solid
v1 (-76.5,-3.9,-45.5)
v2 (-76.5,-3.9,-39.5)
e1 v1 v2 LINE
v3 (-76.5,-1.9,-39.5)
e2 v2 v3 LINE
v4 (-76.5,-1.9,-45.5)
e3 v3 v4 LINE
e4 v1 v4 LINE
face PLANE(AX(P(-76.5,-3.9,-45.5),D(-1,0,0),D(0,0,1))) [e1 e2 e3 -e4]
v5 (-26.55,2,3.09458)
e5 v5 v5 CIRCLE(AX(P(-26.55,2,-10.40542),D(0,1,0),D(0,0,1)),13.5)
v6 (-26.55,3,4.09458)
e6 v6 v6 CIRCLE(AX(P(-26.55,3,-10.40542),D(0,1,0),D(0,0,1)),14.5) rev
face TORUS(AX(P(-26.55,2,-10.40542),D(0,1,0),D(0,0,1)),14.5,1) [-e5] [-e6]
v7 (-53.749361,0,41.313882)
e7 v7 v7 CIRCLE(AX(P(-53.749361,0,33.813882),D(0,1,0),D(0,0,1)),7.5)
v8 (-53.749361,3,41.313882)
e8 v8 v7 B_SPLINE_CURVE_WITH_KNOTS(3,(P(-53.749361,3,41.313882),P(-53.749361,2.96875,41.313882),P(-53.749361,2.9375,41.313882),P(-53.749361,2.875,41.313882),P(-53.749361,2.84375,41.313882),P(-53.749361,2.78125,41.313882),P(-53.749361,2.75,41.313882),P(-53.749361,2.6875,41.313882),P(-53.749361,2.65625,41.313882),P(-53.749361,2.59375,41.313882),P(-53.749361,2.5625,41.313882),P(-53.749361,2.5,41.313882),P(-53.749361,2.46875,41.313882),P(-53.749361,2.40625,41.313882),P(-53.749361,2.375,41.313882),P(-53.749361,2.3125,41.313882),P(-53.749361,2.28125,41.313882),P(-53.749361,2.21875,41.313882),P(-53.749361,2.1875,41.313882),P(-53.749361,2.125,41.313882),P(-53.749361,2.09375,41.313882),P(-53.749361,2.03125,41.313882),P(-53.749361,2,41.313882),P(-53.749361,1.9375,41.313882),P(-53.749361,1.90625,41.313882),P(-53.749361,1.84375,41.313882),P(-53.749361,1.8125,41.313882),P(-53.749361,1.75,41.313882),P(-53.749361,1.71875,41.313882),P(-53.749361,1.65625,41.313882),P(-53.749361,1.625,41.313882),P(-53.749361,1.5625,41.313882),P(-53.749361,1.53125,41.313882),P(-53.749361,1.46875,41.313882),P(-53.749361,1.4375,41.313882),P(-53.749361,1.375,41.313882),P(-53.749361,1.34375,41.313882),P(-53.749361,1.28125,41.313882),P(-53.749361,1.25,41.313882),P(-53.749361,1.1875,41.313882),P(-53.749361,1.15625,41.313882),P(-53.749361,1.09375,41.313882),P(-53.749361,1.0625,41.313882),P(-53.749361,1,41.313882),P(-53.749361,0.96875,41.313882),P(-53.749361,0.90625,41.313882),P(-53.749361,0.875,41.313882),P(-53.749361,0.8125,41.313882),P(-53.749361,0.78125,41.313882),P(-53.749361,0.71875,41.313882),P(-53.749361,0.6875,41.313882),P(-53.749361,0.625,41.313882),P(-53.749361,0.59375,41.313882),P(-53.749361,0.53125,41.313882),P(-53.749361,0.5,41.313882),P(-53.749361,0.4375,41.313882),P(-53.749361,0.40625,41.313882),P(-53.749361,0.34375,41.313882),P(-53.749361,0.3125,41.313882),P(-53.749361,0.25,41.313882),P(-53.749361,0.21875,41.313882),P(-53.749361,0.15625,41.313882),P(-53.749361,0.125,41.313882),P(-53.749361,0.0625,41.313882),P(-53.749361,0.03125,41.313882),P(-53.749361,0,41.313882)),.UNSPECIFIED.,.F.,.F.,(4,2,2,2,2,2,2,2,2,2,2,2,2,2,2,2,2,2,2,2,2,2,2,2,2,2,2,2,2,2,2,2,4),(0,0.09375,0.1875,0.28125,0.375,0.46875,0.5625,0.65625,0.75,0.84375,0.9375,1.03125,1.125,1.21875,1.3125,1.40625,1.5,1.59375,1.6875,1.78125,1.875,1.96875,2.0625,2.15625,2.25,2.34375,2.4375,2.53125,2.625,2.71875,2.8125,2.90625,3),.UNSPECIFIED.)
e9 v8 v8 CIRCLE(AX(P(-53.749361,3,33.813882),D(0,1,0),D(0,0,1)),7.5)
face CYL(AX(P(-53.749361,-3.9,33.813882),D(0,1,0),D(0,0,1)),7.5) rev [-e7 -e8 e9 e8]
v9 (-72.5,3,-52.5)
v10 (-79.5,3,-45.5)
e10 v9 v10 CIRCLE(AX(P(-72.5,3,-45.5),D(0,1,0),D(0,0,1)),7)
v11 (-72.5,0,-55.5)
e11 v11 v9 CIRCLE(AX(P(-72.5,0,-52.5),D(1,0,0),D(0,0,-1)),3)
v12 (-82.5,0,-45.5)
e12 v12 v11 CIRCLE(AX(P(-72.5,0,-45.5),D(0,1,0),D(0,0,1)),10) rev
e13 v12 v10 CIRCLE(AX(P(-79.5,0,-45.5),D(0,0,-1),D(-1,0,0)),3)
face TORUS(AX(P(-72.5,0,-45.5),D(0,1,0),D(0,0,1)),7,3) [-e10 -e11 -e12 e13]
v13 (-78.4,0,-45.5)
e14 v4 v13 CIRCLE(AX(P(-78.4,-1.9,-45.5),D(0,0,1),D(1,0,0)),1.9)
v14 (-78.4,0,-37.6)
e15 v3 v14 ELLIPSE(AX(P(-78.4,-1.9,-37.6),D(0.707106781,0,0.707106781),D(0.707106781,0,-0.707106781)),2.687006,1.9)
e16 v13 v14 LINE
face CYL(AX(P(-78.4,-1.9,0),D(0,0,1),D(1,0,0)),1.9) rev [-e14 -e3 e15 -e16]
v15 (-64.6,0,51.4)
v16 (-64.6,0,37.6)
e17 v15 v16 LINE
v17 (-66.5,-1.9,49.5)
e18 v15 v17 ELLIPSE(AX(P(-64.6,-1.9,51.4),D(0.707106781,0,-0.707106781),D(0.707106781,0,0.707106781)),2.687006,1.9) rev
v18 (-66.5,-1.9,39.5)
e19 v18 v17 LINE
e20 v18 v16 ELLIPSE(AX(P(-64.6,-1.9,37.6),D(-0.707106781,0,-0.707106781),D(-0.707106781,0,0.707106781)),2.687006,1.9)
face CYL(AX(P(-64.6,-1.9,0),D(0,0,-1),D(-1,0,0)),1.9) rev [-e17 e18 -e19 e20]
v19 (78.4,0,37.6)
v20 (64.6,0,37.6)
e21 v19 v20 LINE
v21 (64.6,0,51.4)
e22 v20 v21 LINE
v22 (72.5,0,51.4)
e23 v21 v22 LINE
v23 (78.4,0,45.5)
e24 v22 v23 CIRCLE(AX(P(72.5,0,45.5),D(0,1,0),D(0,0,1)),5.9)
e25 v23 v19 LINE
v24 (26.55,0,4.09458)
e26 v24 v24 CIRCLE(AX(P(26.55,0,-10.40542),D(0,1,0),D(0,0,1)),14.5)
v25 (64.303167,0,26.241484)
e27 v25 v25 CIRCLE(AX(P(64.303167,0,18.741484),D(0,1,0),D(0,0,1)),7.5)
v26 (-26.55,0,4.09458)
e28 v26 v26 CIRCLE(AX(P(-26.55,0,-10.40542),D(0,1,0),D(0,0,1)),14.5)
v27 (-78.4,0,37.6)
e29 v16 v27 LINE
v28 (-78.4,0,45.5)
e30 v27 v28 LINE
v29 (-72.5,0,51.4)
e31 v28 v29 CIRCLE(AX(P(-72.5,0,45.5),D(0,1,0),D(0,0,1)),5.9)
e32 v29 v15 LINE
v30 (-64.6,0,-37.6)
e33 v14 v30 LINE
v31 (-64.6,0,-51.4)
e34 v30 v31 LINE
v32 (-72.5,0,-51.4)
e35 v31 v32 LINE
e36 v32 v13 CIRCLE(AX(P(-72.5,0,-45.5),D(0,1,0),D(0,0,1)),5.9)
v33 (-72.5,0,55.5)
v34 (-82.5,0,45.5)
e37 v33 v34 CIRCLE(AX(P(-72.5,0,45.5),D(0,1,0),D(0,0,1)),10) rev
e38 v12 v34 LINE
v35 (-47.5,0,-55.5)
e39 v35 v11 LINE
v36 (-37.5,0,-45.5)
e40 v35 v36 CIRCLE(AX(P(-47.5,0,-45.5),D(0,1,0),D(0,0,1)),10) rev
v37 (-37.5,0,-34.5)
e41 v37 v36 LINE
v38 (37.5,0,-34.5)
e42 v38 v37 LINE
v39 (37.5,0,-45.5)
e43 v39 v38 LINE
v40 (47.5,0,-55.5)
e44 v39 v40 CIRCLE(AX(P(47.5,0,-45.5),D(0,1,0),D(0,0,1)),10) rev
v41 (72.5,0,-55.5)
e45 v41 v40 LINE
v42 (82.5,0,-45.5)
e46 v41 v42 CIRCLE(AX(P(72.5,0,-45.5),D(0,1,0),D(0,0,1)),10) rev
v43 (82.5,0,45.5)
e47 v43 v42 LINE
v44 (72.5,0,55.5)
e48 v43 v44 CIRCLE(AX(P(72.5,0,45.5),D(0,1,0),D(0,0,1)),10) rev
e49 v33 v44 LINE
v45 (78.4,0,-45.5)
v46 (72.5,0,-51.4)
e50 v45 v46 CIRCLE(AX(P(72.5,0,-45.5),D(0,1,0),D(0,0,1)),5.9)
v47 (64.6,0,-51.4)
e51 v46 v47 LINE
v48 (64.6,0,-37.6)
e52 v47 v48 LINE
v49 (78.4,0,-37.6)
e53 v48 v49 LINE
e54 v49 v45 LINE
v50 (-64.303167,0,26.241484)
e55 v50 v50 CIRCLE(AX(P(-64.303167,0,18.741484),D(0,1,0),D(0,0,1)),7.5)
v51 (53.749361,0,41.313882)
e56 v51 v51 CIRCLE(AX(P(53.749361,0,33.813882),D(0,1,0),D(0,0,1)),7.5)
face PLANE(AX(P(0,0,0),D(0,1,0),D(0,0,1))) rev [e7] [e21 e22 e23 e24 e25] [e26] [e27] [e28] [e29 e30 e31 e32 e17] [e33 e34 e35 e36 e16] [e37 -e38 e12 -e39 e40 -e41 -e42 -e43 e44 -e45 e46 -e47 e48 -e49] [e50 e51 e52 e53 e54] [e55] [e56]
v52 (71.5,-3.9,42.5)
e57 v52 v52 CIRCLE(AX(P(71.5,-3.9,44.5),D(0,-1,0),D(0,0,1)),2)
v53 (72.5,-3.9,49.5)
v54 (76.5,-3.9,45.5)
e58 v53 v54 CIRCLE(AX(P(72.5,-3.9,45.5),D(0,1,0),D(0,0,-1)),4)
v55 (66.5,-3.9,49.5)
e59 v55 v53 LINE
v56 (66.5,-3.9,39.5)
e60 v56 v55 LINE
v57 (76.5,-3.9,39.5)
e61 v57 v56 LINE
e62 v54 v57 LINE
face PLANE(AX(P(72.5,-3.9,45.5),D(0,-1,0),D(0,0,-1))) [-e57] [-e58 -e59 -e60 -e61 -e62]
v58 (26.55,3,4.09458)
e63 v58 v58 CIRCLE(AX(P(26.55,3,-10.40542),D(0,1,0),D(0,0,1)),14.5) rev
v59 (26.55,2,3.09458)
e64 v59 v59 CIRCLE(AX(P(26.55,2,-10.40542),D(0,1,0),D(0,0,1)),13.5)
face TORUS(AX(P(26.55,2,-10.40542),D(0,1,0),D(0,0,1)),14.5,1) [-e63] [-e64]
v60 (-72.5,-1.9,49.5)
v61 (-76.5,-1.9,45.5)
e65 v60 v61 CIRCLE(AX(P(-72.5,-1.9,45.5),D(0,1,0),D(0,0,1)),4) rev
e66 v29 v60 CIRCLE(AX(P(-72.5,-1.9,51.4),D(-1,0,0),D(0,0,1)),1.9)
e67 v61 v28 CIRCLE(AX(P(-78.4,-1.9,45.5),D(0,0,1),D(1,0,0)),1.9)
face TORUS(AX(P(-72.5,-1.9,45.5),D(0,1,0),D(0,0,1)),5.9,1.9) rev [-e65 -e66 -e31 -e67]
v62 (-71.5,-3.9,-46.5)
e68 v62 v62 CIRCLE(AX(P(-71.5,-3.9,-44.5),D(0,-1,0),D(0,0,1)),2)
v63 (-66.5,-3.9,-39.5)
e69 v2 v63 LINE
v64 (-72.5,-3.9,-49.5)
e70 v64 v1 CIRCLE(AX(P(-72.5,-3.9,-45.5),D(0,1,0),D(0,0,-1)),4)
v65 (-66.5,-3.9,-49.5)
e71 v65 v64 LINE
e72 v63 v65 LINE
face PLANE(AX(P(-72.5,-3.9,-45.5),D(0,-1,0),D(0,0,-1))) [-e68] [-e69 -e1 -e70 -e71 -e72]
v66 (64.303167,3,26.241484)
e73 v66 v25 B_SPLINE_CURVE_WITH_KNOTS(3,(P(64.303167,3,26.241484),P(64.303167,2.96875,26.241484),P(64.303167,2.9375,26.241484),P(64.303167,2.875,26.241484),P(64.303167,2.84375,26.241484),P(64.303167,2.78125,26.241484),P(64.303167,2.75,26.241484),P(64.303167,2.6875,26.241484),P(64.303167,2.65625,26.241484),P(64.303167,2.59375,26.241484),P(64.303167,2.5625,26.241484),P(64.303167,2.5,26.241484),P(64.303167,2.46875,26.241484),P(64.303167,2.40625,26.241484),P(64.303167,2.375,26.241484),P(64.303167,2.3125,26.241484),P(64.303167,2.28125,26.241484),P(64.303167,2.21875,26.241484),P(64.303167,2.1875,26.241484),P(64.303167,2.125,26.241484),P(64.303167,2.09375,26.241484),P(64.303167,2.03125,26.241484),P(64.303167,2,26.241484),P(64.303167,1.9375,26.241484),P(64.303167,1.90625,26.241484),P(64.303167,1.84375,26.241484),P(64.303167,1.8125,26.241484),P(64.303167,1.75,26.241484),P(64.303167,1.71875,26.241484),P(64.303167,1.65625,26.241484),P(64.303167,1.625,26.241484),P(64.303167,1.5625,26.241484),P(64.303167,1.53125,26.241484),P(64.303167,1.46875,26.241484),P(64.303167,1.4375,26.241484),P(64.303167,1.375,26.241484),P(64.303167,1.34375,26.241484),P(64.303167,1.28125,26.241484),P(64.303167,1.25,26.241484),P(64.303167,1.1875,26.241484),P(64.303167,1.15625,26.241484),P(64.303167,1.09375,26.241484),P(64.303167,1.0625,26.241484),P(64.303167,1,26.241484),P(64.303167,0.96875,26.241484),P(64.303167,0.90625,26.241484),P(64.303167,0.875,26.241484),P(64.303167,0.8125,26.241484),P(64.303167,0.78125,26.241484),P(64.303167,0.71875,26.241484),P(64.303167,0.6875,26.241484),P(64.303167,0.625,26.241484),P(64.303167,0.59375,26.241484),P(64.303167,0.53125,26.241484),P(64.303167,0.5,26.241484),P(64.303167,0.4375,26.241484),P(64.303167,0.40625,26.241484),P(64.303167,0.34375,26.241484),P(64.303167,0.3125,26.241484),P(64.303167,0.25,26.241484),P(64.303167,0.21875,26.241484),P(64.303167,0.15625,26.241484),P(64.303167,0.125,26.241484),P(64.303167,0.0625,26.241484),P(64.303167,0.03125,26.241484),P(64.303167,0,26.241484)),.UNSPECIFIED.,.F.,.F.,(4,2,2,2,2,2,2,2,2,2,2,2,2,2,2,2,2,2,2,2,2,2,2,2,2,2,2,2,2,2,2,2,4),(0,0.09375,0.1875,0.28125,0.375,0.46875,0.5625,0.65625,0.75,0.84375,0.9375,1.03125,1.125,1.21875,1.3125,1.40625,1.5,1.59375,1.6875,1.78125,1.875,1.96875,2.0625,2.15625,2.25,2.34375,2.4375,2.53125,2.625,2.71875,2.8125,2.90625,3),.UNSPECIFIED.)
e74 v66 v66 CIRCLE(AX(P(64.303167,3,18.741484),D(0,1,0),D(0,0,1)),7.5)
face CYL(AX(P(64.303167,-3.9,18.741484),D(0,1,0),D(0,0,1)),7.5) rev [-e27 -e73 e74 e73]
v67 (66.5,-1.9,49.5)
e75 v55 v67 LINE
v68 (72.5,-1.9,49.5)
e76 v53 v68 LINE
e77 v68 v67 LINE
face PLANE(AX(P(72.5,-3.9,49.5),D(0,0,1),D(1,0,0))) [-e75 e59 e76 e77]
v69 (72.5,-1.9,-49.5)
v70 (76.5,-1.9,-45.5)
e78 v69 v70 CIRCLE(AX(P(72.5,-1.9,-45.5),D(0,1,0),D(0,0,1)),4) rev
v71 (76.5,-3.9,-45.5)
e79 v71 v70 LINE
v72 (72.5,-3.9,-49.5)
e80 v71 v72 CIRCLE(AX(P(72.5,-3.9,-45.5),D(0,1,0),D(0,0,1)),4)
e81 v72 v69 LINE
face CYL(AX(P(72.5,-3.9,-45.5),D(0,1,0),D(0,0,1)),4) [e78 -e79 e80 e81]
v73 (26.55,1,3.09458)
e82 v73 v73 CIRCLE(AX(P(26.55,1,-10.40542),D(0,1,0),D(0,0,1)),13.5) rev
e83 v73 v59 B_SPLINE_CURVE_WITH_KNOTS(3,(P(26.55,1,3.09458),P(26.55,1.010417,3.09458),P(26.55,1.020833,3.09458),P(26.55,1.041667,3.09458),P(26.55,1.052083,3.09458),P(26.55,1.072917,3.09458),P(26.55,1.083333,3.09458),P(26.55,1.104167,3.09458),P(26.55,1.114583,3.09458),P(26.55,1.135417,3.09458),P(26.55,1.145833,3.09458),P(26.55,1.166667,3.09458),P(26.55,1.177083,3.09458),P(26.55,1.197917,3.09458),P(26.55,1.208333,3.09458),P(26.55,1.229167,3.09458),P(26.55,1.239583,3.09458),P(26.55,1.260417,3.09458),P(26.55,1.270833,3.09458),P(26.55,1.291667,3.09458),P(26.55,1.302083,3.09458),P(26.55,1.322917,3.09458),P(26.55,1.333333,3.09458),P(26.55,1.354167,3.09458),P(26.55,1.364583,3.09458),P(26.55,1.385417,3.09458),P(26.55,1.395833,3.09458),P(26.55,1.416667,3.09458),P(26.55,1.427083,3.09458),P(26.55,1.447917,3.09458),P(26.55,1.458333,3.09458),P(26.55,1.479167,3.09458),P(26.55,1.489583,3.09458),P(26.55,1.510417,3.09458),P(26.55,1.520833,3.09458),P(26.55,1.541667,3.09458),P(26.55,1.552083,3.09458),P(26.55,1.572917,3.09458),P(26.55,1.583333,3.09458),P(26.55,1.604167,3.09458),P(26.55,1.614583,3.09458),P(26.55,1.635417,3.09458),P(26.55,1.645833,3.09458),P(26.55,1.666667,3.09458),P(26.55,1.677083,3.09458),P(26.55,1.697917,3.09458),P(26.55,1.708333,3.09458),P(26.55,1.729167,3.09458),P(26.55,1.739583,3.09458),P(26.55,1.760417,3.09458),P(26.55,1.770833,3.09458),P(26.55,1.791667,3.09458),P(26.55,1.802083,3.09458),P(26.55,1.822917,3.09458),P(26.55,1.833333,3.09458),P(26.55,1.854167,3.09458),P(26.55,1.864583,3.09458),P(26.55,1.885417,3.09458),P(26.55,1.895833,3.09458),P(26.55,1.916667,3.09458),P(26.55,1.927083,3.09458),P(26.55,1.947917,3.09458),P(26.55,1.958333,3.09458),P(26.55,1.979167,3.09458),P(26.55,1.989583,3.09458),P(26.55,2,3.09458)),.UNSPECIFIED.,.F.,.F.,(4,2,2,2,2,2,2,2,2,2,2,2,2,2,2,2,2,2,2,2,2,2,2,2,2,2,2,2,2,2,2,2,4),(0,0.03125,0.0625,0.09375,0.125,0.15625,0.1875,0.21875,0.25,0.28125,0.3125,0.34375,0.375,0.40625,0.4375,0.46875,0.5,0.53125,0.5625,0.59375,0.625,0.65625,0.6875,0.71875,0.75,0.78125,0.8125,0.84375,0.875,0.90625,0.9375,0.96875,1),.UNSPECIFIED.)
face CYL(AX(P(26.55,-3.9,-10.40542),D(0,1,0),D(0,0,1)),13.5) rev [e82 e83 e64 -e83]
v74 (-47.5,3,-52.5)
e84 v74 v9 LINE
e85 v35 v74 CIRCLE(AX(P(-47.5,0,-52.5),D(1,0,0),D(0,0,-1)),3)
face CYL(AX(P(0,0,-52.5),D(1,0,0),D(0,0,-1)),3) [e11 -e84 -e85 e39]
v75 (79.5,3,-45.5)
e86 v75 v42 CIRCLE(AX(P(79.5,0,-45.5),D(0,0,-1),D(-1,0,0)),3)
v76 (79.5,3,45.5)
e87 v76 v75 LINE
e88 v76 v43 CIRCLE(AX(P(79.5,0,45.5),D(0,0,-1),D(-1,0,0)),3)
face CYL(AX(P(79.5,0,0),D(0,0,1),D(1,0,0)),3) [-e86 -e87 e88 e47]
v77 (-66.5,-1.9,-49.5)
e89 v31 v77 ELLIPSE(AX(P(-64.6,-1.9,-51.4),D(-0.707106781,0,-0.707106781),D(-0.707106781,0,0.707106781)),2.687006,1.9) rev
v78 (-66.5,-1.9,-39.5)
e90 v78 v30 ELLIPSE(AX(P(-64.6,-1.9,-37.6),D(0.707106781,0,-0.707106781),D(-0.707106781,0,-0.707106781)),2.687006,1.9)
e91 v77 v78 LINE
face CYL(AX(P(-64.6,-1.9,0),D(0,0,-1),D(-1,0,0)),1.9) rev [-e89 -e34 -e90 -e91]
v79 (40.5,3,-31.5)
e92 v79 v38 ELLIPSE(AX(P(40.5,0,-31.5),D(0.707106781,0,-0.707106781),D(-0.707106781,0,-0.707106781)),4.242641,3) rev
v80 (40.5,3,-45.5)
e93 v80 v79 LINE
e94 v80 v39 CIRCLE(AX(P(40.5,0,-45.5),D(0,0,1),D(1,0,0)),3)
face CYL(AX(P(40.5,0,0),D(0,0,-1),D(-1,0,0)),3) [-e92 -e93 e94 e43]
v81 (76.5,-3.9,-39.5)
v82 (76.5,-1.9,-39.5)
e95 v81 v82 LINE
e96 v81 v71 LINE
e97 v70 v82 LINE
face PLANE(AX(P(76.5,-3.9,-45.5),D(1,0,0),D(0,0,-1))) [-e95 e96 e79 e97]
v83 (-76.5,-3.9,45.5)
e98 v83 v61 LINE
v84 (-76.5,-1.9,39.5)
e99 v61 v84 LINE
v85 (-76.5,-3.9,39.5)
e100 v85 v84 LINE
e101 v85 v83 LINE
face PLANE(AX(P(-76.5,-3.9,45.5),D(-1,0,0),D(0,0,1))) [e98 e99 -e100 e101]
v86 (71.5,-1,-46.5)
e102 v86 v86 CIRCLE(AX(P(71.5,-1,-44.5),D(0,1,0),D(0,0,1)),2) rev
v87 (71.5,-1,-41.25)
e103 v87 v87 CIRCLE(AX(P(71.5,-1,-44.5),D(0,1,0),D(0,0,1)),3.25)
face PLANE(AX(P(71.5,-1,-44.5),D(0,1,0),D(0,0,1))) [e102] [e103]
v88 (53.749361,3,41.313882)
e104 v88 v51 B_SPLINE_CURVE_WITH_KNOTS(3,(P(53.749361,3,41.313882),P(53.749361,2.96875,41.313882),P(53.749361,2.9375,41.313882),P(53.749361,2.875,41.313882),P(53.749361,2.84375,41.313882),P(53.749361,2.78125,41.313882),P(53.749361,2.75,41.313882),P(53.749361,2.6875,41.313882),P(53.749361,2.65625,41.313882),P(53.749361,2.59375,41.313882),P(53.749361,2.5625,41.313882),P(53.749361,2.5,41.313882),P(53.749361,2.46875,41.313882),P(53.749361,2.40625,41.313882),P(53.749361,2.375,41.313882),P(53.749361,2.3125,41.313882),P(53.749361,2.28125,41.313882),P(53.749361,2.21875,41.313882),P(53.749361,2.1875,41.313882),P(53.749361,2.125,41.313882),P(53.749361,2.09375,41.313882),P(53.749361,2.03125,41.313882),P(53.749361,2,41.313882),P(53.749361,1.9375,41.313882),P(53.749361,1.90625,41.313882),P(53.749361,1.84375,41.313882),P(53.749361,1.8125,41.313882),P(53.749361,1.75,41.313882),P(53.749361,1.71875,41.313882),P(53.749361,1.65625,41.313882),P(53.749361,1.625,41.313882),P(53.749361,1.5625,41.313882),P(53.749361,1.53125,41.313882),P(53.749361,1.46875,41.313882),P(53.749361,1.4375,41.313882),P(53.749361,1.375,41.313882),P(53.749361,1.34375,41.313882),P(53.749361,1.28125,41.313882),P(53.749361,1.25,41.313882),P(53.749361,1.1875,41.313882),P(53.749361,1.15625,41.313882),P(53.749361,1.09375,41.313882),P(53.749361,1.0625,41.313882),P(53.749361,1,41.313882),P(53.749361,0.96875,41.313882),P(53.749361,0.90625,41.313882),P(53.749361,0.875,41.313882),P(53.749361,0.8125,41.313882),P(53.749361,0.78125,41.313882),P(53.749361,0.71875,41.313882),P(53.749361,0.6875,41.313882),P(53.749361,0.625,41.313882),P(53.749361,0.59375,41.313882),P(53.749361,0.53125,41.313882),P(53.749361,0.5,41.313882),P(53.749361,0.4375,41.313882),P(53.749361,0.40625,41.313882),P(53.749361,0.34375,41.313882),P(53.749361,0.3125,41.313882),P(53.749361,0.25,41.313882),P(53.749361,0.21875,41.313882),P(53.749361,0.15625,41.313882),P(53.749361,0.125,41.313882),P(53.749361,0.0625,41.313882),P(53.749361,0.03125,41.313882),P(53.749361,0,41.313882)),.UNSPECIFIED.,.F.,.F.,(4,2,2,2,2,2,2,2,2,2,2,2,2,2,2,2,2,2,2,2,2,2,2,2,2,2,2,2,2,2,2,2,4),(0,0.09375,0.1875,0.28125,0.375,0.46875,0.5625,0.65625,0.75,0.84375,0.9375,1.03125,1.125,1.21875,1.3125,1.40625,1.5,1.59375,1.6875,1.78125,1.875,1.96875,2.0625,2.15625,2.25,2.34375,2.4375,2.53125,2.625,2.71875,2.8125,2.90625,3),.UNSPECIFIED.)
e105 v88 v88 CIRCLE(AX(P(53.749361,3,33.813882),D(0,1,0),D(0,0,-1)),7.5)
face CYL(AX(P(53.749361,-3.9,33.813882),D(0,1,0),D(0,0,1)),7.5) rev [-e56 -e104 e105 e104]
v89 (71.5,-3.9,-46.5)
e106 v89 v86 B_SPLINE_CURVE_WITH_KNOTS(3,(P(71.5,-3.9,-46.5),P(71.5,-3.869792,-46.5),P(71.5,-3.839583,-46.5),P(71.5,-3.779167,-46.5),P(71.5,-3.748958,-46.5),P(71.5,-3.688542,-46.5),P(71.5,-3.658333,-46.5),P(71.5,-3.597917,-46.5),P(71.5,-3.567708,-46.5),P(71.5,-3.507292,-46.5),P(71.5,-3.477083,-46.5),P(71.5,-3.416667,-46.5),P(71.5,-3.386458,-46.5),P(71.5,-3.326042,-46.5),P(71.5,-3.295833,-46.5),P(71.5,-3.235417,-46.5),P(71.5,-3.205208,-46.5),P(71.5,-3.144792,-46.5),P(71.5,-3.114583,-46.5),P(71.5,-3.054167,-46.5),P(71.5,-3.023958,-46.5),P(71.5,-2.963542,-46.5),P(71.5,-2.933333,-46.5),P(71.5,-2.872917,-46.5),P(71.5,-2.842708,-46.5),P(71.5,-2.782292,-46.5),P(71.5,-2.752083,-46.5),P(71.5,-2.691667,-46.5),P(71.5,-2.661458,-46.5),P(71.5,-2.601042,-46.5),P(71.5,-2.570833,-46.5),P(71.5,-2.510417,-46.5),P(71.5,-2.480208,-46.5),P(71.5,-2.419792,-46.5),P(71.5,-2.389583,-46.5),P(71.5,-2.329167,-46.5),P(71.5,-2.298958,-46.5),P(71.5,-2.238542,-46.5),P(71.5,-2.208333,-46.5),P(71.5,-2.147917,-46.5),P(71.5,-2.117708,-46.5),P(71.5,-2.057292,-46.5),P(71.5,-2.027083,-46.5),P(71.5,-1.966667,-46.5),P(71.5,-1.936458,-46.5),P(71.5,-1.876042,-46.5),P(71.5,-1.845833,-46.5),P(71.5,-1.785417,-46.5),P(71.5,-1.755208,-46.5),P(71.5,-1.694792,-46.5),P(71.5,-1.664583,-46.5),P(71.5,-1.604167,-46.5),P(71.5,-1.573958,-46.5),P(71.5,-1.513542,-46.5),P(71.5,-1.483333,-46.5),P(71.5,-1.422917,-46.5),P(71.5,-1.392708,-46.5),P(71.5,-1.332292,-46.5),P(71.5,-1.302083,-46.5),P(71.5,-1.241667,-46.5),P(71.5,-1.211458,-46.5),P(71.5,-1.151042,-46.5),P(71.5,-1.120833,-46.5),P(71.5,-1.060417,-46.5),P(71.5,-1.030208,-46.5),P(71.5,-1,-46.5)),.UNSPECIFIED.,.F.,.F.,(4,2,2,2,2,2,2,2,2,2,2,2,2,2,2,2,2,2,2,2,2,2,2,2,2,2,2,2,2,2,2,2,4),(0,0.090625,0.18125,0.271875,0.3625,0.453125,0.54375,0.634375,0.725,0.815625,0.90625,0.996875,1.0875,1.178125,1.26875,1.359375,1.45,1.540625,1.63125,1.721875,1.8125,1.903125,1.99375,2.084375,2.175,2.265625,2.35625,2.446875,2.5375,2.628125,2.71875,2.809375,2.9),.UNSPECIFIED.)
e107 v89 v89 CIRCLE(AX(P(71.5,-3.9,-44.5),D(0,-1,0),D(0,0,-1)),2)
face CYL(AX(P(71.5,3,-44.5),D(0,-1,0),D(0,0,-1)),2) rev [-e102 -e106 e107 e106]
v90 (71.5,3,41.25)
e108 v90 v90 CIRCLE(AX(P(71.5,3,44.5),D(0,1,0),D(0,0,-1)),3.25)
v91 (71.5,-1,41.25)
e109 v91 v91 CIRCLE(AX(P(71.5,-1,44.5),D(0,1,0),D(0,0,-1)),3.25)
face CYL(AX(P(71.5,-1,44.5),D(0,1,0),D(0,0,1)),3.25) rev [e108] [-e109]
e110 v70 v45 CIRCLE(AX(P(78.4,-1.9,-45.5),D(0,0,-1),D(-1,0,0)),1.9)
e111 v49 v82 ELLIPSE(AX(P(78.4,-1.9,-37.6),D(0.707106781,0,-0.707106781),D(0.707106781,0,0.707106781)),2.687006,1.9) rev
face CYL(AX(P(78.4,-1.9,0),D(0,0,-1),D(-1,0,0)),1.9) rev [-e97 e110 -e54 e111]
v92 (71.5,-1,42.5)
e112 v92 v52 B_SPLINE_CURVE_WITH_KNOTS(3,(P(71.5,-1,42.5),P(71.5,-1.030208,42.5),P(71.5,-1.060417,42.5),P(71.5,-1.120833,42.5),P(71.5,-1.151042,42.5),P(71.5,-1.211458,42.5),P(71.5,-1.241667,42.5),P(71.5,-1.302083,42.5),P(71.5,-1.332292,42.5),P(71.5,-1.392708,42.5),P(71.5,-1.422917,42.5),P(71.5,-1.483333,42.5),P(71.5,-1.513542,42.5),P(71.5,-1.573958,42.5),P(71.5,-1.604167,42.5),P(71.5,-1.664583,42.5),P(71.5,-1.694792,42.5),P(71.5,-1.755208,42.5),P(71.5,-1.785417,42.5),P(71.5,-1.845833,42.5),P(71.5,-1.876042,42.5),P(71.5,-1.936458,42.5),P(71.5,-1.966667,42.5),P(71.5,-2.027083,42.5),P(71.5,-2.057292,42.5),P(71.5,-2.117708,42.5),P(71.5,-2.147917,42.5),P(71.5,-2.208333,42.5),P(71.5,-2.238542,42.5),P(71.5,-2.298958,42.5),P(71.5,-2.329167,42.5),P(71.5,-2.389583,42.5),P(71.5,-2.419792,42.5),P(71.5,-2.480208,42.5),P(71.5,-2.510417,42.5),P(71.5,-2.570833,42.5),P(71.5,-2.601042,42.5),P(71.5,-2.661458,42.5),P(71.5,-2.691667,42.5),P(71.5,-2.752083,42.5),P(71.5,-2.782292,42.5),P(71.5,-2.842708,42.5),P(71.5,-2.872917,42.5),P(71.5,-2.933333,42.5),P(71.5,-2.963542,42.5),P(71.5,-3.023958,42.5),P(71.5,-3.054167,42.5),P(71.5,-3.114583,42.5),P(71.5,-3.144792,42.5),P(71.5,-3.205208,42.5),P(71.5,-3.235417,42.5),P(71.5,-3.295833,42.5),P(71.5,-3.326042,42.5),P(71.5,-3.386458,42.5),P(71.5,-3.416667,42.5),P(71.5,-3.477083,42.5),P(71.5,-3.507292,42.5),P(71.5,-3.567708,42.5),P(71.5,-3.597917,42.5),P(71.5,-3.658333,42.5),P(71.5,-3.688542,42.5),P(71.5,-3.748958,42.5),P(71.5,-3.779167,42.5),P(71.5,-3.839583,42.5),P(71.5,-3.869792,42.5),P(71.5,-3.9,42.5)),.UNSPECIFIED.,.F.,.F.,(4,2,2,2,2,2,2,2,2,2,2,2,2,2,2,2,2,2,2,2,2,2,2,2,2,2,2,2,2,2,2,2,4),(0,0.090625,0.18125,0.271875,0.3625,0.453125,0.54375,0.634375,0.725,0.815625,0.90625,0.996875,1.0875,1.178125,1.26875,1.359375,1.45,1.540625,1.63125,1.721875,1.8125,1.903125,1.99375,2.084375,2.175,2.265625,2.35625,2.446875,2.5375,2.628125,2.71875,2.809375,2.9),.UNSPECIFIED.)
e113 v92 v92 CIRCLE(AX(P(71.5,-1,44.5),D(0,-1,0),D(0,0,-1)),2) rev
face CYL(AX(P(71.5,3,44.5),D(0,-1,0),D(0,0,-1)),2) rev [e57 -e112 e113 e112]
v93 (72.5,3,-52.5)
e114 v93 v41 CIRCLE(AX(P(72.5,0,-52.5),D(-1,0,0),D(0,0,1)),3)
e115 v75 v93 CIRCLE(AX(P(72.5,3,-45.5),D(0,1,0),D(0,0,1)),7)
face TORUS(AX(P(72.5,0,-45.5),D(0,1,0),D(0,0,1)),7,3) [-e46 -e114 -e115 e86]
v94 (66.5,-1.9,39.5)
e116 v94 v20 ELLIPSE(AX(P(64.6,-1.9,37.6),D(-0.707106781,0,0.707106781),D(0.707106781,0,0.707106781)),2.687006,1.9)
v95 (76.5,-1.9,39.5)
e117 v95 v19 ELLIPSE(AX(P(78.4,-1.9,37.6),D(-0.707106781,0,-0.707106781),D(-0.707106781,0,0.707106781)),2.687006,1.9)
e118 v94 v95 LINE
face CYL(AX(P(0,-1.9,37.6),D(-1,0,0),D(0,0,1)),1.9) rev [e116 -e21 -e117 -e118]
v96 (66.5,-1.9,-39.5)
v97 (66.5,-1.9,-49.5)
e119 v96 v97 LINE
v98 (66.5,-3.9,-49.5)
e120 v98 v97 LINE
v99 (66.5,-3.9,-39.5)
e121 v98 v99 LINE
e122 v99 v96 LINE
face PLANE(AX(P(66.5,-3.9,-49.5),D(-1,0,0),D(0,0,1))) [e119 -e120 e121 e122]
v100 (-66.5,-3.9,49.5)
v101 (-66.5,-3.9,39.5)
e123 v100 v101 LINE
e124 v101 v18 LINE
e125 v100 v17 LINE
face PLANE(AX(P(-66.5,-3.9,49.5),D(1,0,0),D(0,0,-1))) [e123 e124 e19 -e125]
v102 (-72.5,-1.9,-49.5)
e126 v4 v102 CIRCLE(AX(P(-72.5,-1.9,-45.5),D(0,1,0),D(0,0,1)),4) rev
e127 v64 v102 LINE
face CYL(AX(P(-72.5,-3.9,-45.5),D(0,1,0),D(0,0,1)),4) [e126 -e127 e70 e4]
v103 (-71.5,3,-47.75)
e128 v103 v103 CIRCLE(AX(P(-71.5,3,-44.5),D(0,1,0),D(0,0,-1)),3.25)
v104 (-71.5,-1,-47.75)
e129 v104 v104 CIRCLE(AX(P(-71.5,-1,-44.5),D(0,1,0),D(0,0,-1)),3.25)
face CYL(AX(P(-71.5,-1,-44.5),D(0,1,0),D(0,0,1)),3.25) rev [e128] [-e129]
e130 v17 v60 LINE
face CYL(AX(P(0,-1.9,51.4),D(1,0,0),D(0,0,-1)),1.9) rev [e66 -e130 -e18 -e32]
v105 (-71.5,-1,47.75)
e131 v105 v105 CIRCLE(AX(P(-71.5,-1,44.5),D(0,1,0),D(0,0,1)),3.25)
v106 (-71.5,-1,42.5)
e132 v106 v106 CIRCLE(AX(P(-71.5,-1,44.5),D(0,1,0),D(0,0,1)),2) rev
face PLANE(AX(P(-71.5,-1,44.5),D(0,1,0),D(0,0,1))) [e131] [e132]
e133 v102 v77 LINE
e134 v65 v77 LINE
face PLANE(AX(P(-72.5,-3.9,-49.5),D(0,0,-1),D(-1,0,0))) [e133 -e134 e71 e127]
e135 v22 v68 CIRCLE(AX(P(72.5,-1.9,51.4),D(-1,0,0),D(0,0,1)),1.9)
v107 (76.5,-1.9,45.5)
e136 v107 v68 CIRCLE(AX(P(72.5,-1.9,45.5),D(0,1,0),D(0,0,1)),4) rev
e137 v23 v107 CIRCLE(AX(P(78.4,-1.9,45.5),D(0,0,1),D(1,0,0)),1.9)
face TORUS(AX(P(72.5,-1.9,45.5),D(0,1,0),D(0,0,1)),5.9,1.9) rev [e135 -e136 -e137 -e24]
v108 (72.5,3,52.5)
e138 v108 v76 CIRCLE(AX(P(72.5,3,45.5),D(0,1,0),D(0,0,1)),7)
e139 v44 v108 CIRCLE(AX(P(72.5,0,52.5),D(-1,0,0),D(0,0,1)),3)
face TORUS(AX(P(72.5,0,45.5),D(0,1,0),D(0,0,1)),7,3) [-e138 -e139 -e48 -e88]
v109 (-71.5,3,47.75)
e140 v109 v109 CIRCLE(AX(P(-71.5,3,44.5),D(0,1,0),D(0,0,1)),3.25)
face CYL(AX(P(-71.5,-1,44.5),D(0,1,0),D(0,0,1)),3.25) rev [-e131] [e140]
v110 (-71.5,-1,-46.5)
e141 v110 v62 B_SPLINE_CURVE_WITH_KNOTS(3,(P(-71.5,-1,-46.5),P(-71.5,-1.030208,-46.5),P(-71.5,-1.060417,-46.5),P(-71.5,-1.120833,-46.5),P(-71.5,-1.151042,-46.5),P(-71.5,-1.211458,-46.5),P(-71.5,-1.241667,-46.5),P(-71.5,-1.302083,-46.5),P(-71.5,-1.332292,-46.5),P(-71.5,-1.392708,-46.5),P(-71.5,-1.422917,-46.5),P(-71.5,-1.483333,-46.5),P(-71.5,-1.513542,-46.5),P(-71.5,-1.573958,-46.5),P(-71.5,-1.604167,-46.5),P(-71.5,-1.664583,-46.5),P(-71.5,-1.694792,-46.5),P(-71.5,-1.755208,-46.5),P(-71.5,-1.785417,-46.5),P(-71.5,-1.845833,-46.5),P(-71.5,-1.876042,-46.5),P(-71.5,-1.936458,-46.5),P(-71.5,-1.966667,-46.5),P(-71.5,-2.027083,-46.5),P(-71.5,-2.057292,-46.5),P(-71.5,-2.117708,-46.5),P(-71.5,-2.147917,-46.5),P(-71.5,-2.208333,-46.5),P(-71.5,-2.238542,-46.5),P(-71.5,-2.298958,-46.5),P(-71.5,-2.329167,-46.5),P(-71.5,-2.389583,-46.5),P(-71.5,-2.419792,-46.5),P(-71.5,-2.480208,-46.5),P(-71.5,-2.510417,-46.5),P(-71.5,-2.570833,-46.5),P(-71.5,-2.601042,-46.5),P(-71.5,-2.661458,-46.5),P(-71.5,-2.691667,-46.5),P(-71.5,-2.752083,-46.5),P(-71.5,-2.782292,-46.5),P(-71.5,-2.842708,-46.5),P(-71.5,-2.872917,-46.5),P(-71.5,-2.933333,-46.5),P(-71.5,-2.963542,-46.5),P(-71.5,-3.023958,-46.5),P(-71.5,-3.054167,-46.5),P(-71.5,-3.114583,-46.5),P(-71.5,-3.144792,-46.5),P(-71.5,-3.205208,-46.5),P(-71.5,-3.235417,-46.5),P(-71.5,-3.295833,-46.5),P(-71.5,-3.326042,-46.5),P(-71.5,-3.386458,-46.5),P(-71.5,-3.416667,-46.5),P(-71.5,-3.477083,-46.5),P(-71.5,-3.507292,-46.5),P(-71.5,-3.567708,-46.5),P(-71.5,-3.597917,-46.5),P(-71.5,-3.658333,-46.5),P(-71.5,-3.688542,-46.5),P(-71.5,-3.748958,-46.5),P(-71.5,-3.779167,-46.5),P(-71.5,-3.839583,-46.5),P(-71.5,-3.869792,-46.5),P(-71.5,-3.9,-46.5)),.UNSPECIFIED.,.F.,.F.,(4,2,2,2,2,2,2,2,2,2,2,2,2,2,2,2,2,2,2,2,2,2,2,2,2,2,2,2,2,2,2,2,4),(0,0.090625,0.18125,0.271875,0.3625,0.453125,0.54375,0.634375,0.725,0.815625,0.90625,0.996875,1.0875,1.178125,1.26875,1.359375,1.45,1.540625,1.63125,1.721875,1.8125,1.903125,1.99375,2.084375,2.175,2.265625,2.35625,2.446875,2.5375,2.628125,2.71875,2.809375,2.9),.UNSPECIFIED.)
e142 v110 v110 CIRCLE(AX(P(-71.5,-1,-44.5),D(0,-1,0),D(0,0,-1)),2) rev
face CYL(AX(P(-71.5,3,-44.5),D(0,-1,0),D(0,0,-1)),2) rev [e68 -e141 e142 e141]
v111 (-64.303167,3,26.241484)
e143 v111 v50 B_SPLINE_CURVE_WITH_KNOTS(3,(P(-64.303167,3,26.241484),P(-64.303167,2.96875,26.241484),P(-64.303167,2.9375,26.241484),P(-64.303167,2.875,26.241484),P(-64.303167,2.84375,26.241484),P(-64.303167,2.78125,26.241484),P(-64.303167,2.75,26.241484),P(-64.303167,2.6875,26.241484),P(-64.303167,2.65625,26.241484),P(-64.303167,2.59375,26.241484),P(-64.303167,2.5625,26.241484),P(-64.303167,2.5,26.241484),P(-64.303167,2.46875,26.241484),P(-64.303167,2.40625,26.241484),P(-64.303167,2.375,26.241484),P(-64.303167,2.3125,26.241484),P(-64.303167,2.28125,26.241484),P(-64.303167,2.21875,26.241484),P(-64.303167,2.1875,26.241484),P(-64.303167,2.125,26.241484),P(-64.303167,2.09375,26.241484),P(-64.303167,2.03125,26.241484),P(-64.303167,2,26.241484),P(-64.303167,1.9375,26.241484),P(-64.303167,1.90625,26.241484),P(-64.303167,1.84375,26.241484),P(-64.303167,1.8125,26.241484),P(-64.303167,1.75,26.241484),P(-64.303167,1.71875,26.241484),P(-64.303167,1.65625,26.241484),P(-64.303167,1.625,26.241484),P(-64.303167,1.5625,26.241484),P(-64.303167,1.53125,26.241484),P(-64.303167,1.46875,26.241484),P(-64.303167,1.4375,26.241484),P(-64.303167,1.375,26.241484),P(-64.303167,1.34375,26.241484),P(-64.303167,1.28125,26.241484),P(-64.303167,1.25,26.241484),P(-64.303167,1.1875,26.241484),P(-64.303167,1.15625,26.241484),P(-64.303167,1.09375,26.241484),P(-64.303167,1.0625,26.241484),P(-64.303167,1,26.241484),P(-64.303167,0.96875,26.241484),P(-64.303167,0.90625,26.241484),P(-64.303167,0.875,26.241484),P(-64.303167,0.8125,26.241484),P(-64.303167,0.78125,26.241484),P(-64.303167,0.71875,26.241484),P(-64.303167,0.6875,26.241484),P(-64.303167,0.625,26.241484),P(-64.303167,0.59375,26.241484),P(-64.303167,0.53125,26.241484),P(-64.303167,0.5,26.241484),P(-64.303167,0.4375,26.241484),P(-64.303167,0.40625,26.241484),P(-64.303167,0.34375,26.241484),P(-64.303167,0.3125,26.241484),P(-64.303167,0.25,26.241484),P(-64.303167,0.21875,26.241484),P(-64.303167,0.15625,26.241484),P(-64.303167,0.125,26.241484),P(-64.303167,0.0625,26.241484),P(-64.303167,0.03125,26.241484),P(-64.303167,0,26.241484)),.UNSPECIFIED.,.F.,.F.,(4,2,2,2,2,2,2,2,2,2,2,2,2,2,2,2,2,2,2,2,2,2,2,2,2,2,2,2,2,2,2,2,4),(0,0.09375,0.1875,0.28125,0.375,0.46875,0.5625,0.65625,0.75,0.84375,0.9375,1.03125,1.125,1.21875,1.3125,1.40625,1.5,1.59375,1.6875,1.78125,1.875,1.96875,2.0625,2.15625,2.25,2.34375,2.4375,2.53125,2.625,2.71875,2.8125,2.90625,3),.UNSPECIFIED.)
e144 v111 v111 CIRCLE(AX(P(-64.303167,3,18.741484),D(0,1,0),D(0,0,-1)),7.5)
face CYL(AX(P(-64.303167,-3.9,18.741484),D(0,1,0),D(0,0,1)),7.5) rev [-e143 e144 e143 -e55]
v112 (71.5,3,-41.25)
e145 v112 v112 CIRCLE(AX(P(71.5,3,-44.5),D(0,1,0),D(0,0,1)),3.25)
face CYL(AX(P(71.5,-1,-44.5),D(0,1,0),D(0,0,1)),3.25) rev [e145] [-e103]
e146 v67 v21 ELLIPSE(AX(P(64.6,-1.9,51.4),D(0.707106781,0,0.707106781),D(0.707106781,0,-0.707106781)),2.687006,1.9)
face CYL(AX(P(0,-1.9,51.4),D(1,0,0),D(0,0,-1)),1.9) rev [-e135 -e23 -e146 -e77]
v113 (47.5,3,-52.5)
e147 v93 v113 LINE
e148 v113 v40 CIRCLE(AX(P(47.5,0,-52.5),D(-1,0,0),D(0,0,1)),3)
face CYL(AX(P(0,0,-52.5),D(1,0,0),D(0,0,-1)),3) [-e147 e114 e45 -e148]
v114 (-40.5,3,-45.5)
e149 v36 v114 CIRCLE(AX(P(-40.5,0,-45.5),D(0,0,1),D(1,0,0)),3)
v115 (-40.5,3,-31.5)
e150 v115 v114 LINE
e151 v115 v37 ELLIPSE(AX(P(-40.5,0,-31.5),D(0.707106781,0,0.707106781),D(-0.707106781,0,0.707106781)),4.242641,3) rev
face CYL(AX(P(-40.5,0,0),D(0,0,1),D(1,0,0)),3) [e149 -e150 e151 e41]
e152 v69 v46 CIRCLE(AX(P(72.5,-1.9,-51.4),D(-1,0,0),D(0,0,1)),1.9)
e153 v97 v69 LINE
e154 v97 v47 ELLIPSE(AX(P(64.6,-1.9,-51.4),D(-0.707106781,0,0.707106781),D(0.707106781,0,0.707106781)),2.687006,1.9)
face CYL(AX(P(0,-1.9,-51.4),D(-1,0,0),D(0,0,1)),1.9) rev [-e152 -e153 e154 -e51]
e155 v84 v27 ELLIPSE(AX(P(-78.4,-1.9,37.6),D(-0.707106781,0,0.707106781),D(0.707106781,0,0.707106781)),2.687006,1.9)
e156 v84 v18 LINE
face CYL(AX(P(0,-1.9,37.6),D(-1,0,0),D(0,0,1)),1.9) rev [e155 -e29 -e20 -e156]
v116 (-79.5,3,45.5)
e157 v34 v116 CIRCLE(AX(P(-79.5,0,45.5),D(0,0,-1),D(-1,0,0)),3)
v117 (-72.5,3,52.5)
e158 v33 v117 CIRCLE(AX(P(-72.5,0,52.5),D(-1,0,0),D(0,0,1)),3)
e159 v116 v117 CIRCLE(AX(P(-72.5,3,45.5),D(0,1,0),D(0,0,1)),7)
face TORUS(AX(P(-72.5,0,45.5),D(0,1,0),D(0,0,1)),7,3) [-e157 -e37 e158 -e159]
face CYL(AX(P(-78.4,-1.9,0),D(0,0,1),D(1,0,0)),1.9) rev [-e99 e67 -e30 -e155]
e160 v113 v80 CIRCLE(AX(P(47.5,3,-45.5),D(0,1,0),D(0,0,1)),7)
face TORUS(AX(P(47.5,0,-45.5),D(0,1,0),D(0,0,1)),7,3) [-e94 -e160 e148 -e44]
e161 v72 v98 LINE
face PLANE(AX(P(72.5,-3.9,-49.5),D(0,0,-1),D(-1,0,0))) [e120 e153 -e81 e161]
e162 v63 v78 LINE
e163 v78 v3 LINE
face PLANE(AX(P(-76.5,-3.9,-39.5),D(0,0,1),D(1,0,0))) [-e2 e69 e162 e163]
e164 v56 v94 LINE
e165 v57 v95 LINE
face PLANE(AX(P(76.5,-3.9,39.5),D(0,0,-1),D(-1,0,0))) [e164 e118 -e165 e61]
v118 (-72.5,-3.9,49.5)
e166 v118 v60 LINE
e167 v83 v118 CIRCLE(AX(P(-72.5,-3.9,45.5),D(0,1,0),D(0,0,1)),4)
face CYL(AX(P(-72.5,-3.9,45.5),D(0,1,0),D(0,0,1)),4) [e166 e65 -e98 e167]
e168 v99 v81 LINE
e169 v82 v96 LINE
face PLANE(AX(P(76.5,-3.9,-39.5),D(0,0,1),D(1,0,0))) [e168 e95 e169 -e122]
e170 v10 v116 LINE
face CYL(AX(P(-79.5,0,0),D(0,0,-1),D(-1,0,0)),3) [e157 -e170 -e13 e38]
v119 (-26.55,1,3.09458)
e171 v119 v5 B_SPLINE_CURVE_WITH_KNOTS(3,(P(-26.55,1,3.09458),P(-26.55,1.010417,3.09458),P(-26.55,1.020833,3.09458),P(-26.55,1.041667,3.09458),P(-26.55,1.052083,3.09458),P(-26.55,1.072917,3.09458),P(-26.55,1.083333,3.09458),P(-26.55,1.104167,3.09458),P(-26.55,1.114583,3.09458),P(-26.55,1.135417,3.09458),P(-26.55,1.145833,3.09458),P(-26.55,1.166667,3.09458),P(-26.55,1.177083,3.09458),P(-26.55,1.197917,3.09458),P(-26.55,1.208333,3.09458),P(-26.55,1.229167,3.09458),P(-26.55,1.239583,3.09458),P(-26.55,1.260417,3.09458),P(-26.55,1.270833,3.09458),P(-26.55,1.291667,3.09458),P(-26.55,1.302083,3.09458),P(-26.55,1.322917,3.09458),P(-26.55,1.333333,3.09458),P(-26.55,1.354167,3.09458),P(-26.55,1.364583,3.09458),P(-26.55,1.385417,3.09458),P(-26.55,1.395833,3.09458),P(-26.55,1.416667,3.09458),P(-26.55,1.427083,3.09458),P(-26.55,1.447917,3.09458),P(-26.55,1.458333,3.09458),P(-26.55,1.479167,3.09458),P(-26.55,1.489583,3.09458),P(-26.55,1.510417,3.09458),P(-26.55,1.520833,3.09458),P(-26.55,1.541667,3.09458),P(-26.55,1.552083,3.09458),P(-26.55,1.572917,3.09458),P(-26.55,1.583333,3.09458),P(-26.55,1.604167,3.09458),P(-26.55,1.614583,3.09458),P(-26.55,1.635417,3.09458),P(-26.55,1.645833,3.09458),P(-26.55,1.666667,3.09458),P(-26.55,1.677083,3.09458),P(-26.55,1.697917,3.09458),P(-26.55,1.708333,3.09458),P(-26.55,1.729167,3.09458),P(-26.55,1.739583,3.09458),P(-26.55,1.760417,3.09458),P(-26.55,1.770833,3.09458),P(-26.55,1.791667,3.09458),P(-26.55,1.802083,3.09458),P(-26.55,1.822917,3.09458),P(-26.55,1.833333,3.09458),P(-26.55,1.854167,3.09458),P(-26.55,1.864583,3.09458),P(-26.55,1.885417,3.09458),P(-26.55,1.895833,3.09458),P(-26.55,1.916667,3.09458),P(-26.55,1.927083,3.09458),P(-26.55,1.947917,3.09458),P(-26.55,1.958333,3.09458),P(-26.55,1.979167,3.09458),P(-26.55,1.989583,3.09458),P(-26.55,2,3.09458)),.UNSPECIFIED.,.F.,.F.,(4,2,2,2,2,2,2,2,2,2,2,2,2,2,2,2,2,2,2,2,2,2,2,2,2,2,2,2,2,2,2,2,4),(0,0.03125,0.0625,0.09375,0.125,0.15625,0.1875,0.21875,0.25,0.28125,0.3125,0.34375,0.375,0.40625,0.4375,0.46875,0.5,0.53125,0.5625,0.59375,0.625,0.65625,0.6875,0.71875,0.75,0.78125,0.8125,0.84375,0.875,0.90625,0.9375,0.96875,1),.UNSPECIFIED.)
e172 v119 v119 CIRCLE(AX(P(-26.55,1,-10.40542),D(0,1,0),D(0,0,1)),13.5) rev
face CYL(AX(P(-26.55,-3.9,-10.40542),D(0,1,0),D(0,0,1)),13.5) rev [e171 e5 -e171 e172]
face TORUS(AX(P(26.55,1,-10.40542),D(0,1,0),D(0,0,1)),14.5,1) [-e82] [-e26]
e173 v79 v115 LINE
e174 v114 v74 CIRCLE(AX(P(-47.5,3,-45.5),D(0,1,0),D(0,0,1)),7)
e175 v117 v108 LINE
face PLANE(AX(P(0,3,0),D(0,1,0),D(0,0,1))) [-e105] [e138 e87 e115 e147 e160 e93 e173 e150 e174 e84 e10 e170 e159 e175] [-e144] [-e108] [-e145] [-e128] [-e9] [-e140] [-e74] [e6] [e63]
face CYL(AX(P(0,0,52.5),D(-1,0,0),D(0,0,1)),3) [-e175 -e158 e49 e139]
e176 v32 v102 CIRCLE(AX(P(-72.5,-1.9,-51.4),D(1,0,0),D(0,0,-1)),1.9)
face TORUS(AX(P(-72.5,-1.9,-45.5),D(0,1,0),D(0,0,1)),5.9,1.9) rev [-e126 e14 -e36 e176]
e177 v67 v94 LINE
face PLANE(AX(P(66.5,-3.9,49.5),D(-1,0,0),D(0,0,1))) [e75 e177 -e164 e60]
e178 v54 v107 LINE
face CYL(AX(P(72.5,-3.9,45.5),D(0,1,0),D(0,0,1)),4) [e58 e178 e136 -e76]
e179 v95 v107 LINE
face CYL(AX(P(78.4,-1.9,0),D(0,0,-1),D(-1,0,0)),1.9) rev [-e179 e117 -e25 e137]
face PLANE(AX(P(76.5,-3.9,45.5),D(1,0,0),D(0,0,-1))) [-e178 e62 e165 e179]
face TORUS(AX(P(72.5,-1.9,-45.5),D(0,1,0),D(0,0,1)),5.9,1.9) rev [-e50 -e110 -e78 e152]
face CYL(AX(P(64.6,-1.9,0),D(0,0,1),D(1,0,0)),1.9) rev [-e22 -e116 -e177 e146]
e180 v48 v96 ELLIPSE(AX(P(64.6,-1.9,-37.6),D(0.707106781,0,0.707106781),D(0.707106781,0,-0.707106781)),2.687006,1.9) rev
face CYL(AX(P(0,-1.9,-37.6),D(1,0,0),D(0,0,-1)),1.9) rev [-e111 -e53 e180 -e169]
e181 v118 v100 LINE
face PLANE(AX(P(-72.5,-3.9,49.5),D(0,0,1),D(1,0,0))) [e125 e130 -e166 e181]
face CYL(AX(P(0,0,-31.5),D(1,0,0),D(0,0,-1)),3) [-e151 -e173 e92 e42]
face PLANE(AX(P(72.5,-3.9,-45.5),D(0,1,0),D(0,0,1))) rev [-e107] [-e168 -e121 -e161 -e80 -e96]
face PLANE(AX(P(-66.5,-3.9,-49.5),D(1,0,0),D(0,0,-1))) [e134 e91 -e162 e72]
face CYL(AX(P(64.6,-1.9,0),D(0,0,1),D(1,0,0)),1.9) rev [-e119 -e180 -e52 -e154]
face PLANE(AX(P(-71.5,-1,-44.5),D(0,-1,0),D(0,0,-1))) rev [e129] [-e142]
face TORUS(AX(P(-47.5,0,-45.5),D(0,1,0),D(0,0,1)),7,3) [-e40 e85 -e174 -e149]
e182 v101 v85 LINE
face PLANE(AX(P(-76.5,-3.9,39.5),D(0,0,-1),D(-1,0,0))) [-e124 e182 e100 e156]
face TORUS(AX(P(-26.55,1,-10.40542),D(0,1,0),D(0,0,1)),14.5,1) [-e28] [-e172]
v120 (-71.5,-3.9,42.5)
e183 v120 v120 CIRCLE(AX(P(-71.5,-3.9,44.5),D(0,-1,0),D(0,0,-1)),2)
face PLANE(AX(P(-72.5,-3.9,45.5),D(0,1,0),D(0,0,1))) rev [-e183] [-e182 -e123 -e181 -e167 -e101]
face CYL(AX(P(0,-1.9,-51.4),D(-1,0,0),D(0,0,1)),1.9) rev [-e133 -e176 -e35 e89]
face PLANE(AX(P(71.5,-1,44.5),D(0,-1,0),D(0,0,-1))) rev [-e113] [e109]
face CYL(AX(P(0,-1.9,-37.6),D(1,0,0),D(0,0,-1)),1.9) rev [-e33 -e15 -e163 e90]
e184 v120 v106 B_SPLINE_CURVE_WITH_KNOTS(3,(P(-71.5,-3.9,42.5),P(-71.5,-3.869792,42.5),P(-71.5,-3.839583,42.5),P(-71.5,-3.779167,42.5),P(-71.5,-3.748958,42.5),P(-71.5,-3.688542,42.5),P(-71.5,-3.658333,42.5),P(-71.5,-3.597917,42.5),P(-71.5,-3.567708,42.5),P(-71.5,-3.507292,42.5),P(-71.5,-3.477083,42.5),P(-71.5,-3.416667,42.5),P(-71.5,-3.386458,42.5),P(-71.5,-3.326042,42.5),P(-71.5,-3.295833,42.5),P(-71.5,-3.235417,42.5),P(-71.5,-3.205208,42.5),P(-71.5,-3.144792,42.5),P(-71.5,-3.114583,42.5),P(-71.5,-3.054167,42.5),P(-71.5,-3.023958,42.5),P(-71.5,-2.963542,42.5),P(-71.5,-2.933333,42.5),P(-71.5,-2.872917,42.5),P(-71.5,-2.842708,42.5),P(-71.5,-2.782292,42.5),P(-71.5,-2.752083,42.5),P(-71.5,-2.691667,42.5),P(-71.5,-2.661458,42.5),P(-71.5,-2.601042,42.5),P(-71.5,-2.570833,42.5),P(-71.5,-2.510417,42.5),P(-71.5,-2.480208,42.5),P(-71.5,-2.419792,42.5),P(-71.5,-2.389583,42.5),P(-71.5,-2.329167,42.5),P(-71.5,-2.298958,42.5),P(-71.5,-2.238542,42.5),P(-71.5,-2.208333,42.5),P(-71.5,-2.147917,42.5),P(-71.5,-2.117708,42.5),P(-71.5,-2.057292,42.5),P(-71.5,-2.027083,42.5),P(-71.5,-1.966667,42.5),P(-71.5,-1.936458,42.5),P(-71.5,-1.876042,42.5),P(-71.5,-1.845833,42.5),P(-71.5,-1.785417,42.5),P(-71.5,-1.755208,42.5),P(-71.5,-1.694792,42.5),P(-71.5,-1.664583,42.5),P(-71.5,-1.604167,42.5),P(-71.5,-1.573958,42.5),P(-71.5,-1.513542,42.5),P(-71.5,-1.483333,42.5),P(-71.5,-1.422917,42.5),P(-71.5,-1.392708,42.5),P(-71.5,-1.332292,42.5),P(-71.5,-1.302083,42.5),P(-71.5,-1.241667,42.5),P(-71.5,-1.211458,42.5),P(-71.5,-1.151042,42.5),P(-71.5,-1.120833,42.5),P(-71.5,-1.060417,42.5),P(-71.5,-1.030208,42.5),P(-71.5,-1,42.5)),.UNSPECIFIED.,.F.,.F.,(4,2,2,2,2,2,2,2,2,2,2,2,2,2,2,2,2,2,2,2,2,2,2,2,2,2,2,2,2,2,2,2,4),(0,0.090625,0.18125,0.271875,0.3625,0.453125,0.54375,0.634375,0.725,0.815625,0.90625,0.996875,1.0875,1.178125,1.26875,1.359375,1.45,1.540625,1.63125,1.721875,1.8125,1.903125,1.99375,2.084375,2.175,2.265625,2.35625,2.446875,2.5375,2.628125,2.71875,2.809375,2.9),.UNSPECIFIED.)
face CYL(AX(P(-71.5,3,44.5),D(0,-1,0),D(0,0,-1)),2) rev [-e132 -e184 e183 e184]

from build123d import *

# Parameters (mm, degrees)
BOSS_EXTRUDE1_DEPTH = 3
FILLET1_R           = 10
FILLET4_R           = 10
BOSS_EXTRUDE4_DEPTH = 6.9
FILLET5_R           = 3
SKETCH7_R           = 2
CUT_EXTRUDE2_DEPTH  = 100.670005518
SKETCH8_R           = 3.25
CUT_EXTRUDE3_DEPTH  = 4
SKETCH3_R           = 13.5
CUT_EXTRUDE4_DEPTH  = 100.670005518
FILLET6_R           = 1
SKETCH5_R           = 7.5
CUT_EXTRUDE5_DEPTH  = 100.670005518
FILLET7_R           = 1.9


with BuildPart() as part:
    # Sketch1 → Boss-Extrude1 (new body)
    with BuildSketch(Plane(origin=(0, 0, 0), x_dir=(1, 0, 0), z_dir=(0, 1, 0))):
        Polygon((37.5, 55.5), (37.5, 34.5), (-37.5, 34.5), (-37.5, 55.5), (-82.5, 55.5), (-82.5, -55.5), (82.5, -55.5), (82.5, 55.5), align=None)
    extrude(amount=BOSS_EXTRUDE1_DEPTH)

    # Fillet1
    fillet1_edges = [part.edges().sort_by_distance(p)[0] for p in [
        (82.5, 1.5, 55.5),
        (-82.5, 1.5, 55.5),
    ]]
    fillet(fillet1_edges, radius=FILLET1_R)

    # Fillet4
    fillet4_edges = [part.edges().sort_by_distance(p)[0] for p in [
        (-82.5, 1.5, -55.5),
        (-37.5, 1.5, -55.5),
        (37.5, 1.5, -55.5),
        (82.5, 1.5, -55.5),
    ]]
    fillet(fillet4_edges, radius=FILLET4_R)

    # Sketch6 → Boss-Extrude4 (add)
    with BuildSketch(Plane(origin=(0, 3, 0), x_dir=(1, 0, 0), z_dir=(0, 1, 0))):
        with BuildLine():
            Line((76.5, 39.5), (66.5, 39.5))
            Line((66.5, 39.5), (66.5, 49.5))
            Line((66.5, 49.5), (72.5, 49.5))
            ThreePointArc((72.5, 49.5), (75.328427125, 48.328427125), (76.5, 45.5))
            Line((76.5, 45.5), (76.5, 39.5))
        make_face()
        with BuildLine():
            Line((76.5, -45.5), (76.5, -39.5))
            Line((76.5, -39.5), (66.5, -39.5))
            Line((66.5, -39.5), (66.5, -49.5))
            Line((66.5, -49.5), (72.5, -49.5))
            ThreePointArc((72.5, -49.5), (75.328427125, -48.328427125), (76.5, -45.5))
        make_face()
        with BuildLine():
            Line((-76.5, 39.5), (-66.5, 39.5))
            Line((-66.5, 39.5), (-66.5, 49.5))
            Line((-66.5, 49.5), (-72.5, 49.5))
            ThreePointArc((-72.5, 49.5), (-75.328427125, 48.328427125), (-76.5, 45.5))
            Line((-76.5, 45.5), (-76.5, 39.5))
        make_face()
        with BuildLine():
            Line((-72.5, -49.5), (-66.5, -49.5))
            Line((-66.5, -49.5), (-66.5, -39.5))
            Line((-66.5, -39.5), (-76.5, -39.5))
            Line((-76.5, -39.5), (-76.5, -45.5))
            ThreePointArc((-76.5, -45.5), (-75.328427125, -48.328427125), (-72.5, -49.5))
        make_face()
    extrude(amount=-BOSS_EXTRUDE4_DEPTH)

    # Fillet5
    fillet5_edges = [part.edges().sort_by_distance(p)[0] for p in [
        (-37.5, 3, -40),
        (-40.428932188, 3, -52.571067812),
        (-60, 3, -55.5),
        (-79.571067812, 3, -52.571067812),
        (-82.5, 3, 0),
        (-79.571067812, 3, 52.571067812),
        (0, 3, 55.5),
        (79.571067812, 3, 52.571067812),
        (82.5, 3, 0),
        (79.571067812, 3, -52.571067812),
        (37.5, 3, -40),
        (40.428932188, 3, -52.571067812),
        (0, 3, -34.5),
        (60, 3, -55.5),
    ]]
    fillet(fillet5_edges, radius=FILLET5_R - 0.0001)  # a hair under: the kernel refuses the full size

    # Sketch7 → Cut-Extrude2 (cut, through all)
    with BuildSketch(Plane.XZ.offset(3.9)):
        with Locations(Location((71.5, -44.5, 0), (0, 0, 270))):
            Circle(SKETCH7_R)
        with Locations(Location((-71.5, -44.5, 0), (0, 0, 270))):
            Circle(SKETCH7_R)
        with Locations(Location((-71.5, 44.5, 0), (0, 0, 270))):
            Circle(SKETCH7_R)
        with Locations(Location((71.5, 44.5, 0), (0, 0, 270))):
            Circle(SKETCH7_R)
    extrude(amount=-CUT_EXTRUDE2_DEPTH, mode=Mode.SUBTRACT)

    # Sketch8 → Cut-Extrude3 (cut)
    with BuildSketch(Plane(origin=(0, 3, 0), x_dir=(1, 0, 0), z_dir=(0, 1, 0))):
        with Locations(Location((71.5, 44.5, 0), (0, 0, 270))):
            Circle(SKETCH8_R)
        with Locations(Location((71.5, -44.5, 0), (0, 0, 90))):
            Circle(SKETCH8_R)
        with Locations(Location((-71.5, -44.5, 0), (0, 0, 270))):
            Circle(SKETCH8_R)
        with Locations(Location((-71.5, 44.5, 0), (0, 0, 90))):
            Circle(SKETCH8_R)
    extrude(amount=-CUT_EXTRUDE3_DEPTH, mode=Mode.SUBTRACT)

    # Sketch3 → Cut-Extrude4 (cut, through all)
    with BuildSketch(Plane(origin=(0, 3, 0), x_dir=(1, 0, 0), z_dir=(0, 1, 0))):
        with Locations(Location((26.55, 10.405419746, 0), (0, 0, 270))):
            Circle(SKETCH3_R)
        with Locations(Location((-26.55, 10.405419746, 0), (0, 0, 270))):
            Circle(SKETCH3_R)
    extrude(amount=-CUT_EXTRUDE4_DEPTH, mode=Mode.SUBTRACT)

    # Fillet6
    fillet6_edges = [part.edges().sort_by_distance(p)[0] for p in [
        (26.55, 0, -23.905419746),
        (26.55, 3, -23.905419746),
        (-26.55, 0, -23.905419746),
        (-26.55, 3, -23.905419746),
    ]]
    fillet(fillet6_edges, radius=FILLET6_R)

    # Sketch5 → Cut-Extrude5 (cut, through all)
    with BuildSketch(Plane(origin=(0, 3, 0), x_dir=(1, 0, 0), z_dir=(0, 1, 0))):
        with Locations(Location((-53.749360759, -33.813881578, 0), (0, 0, 270))):
            Circle(SKETCH5_R)
        with Locations(Location((-64.303167187, -18.741483963, 0), (0, 0, 270))):
            Circle(SKETCH5_R)
        with Locations(Location((64.303167187, -18.741483963, 0), (0, 0, 270))):
            Circle(SKETCH5_R)
        with Locations(Location((53.749360759, -33.813881578, 0), (0, 0, 270))):
            Circle(SKETCH5_R)
    extrude(amount=-CUT_EXTRUDE5_DEPTH, mode=Mode.SUBTRACT)

    # Fillet7
    fillet7_edges = [part.edges().sort_by_distance(p)[0] for p in [
        (-71.5, 0, -39.5),
        (-66.5, 0, -44.5),
        (-69.5, 0, -49.5),
        (-75.328427125, 0, -48.328427125),
        (-76.5, 0, -42.5),
        (-69.5, 0, 49.5),
        (-66.5, 0, 44.5),
        (-71.5, 0, 39.5),
        (-76.5, 0, 42.5),
        (-75.328427125, 0, 48.328427125),
        (71.5, 0, -39.5),
        (76.5, 0, -42.5),
        (75.328427125, 0, -48.328427125),
        (69.5, 0, -49.5),
        (66.5, 0, -44.5),
        (76.5, 0, 42.5),
        (71.5, 0, 39.5),
        (66.5, 0, 44.5),
        (69.5, 0, 49.5),
        (75.328427125, 0, 48.328427125),
    ]]
    fillet(fillet7_edges, radius=FILLET7_R)


solid = part.part
